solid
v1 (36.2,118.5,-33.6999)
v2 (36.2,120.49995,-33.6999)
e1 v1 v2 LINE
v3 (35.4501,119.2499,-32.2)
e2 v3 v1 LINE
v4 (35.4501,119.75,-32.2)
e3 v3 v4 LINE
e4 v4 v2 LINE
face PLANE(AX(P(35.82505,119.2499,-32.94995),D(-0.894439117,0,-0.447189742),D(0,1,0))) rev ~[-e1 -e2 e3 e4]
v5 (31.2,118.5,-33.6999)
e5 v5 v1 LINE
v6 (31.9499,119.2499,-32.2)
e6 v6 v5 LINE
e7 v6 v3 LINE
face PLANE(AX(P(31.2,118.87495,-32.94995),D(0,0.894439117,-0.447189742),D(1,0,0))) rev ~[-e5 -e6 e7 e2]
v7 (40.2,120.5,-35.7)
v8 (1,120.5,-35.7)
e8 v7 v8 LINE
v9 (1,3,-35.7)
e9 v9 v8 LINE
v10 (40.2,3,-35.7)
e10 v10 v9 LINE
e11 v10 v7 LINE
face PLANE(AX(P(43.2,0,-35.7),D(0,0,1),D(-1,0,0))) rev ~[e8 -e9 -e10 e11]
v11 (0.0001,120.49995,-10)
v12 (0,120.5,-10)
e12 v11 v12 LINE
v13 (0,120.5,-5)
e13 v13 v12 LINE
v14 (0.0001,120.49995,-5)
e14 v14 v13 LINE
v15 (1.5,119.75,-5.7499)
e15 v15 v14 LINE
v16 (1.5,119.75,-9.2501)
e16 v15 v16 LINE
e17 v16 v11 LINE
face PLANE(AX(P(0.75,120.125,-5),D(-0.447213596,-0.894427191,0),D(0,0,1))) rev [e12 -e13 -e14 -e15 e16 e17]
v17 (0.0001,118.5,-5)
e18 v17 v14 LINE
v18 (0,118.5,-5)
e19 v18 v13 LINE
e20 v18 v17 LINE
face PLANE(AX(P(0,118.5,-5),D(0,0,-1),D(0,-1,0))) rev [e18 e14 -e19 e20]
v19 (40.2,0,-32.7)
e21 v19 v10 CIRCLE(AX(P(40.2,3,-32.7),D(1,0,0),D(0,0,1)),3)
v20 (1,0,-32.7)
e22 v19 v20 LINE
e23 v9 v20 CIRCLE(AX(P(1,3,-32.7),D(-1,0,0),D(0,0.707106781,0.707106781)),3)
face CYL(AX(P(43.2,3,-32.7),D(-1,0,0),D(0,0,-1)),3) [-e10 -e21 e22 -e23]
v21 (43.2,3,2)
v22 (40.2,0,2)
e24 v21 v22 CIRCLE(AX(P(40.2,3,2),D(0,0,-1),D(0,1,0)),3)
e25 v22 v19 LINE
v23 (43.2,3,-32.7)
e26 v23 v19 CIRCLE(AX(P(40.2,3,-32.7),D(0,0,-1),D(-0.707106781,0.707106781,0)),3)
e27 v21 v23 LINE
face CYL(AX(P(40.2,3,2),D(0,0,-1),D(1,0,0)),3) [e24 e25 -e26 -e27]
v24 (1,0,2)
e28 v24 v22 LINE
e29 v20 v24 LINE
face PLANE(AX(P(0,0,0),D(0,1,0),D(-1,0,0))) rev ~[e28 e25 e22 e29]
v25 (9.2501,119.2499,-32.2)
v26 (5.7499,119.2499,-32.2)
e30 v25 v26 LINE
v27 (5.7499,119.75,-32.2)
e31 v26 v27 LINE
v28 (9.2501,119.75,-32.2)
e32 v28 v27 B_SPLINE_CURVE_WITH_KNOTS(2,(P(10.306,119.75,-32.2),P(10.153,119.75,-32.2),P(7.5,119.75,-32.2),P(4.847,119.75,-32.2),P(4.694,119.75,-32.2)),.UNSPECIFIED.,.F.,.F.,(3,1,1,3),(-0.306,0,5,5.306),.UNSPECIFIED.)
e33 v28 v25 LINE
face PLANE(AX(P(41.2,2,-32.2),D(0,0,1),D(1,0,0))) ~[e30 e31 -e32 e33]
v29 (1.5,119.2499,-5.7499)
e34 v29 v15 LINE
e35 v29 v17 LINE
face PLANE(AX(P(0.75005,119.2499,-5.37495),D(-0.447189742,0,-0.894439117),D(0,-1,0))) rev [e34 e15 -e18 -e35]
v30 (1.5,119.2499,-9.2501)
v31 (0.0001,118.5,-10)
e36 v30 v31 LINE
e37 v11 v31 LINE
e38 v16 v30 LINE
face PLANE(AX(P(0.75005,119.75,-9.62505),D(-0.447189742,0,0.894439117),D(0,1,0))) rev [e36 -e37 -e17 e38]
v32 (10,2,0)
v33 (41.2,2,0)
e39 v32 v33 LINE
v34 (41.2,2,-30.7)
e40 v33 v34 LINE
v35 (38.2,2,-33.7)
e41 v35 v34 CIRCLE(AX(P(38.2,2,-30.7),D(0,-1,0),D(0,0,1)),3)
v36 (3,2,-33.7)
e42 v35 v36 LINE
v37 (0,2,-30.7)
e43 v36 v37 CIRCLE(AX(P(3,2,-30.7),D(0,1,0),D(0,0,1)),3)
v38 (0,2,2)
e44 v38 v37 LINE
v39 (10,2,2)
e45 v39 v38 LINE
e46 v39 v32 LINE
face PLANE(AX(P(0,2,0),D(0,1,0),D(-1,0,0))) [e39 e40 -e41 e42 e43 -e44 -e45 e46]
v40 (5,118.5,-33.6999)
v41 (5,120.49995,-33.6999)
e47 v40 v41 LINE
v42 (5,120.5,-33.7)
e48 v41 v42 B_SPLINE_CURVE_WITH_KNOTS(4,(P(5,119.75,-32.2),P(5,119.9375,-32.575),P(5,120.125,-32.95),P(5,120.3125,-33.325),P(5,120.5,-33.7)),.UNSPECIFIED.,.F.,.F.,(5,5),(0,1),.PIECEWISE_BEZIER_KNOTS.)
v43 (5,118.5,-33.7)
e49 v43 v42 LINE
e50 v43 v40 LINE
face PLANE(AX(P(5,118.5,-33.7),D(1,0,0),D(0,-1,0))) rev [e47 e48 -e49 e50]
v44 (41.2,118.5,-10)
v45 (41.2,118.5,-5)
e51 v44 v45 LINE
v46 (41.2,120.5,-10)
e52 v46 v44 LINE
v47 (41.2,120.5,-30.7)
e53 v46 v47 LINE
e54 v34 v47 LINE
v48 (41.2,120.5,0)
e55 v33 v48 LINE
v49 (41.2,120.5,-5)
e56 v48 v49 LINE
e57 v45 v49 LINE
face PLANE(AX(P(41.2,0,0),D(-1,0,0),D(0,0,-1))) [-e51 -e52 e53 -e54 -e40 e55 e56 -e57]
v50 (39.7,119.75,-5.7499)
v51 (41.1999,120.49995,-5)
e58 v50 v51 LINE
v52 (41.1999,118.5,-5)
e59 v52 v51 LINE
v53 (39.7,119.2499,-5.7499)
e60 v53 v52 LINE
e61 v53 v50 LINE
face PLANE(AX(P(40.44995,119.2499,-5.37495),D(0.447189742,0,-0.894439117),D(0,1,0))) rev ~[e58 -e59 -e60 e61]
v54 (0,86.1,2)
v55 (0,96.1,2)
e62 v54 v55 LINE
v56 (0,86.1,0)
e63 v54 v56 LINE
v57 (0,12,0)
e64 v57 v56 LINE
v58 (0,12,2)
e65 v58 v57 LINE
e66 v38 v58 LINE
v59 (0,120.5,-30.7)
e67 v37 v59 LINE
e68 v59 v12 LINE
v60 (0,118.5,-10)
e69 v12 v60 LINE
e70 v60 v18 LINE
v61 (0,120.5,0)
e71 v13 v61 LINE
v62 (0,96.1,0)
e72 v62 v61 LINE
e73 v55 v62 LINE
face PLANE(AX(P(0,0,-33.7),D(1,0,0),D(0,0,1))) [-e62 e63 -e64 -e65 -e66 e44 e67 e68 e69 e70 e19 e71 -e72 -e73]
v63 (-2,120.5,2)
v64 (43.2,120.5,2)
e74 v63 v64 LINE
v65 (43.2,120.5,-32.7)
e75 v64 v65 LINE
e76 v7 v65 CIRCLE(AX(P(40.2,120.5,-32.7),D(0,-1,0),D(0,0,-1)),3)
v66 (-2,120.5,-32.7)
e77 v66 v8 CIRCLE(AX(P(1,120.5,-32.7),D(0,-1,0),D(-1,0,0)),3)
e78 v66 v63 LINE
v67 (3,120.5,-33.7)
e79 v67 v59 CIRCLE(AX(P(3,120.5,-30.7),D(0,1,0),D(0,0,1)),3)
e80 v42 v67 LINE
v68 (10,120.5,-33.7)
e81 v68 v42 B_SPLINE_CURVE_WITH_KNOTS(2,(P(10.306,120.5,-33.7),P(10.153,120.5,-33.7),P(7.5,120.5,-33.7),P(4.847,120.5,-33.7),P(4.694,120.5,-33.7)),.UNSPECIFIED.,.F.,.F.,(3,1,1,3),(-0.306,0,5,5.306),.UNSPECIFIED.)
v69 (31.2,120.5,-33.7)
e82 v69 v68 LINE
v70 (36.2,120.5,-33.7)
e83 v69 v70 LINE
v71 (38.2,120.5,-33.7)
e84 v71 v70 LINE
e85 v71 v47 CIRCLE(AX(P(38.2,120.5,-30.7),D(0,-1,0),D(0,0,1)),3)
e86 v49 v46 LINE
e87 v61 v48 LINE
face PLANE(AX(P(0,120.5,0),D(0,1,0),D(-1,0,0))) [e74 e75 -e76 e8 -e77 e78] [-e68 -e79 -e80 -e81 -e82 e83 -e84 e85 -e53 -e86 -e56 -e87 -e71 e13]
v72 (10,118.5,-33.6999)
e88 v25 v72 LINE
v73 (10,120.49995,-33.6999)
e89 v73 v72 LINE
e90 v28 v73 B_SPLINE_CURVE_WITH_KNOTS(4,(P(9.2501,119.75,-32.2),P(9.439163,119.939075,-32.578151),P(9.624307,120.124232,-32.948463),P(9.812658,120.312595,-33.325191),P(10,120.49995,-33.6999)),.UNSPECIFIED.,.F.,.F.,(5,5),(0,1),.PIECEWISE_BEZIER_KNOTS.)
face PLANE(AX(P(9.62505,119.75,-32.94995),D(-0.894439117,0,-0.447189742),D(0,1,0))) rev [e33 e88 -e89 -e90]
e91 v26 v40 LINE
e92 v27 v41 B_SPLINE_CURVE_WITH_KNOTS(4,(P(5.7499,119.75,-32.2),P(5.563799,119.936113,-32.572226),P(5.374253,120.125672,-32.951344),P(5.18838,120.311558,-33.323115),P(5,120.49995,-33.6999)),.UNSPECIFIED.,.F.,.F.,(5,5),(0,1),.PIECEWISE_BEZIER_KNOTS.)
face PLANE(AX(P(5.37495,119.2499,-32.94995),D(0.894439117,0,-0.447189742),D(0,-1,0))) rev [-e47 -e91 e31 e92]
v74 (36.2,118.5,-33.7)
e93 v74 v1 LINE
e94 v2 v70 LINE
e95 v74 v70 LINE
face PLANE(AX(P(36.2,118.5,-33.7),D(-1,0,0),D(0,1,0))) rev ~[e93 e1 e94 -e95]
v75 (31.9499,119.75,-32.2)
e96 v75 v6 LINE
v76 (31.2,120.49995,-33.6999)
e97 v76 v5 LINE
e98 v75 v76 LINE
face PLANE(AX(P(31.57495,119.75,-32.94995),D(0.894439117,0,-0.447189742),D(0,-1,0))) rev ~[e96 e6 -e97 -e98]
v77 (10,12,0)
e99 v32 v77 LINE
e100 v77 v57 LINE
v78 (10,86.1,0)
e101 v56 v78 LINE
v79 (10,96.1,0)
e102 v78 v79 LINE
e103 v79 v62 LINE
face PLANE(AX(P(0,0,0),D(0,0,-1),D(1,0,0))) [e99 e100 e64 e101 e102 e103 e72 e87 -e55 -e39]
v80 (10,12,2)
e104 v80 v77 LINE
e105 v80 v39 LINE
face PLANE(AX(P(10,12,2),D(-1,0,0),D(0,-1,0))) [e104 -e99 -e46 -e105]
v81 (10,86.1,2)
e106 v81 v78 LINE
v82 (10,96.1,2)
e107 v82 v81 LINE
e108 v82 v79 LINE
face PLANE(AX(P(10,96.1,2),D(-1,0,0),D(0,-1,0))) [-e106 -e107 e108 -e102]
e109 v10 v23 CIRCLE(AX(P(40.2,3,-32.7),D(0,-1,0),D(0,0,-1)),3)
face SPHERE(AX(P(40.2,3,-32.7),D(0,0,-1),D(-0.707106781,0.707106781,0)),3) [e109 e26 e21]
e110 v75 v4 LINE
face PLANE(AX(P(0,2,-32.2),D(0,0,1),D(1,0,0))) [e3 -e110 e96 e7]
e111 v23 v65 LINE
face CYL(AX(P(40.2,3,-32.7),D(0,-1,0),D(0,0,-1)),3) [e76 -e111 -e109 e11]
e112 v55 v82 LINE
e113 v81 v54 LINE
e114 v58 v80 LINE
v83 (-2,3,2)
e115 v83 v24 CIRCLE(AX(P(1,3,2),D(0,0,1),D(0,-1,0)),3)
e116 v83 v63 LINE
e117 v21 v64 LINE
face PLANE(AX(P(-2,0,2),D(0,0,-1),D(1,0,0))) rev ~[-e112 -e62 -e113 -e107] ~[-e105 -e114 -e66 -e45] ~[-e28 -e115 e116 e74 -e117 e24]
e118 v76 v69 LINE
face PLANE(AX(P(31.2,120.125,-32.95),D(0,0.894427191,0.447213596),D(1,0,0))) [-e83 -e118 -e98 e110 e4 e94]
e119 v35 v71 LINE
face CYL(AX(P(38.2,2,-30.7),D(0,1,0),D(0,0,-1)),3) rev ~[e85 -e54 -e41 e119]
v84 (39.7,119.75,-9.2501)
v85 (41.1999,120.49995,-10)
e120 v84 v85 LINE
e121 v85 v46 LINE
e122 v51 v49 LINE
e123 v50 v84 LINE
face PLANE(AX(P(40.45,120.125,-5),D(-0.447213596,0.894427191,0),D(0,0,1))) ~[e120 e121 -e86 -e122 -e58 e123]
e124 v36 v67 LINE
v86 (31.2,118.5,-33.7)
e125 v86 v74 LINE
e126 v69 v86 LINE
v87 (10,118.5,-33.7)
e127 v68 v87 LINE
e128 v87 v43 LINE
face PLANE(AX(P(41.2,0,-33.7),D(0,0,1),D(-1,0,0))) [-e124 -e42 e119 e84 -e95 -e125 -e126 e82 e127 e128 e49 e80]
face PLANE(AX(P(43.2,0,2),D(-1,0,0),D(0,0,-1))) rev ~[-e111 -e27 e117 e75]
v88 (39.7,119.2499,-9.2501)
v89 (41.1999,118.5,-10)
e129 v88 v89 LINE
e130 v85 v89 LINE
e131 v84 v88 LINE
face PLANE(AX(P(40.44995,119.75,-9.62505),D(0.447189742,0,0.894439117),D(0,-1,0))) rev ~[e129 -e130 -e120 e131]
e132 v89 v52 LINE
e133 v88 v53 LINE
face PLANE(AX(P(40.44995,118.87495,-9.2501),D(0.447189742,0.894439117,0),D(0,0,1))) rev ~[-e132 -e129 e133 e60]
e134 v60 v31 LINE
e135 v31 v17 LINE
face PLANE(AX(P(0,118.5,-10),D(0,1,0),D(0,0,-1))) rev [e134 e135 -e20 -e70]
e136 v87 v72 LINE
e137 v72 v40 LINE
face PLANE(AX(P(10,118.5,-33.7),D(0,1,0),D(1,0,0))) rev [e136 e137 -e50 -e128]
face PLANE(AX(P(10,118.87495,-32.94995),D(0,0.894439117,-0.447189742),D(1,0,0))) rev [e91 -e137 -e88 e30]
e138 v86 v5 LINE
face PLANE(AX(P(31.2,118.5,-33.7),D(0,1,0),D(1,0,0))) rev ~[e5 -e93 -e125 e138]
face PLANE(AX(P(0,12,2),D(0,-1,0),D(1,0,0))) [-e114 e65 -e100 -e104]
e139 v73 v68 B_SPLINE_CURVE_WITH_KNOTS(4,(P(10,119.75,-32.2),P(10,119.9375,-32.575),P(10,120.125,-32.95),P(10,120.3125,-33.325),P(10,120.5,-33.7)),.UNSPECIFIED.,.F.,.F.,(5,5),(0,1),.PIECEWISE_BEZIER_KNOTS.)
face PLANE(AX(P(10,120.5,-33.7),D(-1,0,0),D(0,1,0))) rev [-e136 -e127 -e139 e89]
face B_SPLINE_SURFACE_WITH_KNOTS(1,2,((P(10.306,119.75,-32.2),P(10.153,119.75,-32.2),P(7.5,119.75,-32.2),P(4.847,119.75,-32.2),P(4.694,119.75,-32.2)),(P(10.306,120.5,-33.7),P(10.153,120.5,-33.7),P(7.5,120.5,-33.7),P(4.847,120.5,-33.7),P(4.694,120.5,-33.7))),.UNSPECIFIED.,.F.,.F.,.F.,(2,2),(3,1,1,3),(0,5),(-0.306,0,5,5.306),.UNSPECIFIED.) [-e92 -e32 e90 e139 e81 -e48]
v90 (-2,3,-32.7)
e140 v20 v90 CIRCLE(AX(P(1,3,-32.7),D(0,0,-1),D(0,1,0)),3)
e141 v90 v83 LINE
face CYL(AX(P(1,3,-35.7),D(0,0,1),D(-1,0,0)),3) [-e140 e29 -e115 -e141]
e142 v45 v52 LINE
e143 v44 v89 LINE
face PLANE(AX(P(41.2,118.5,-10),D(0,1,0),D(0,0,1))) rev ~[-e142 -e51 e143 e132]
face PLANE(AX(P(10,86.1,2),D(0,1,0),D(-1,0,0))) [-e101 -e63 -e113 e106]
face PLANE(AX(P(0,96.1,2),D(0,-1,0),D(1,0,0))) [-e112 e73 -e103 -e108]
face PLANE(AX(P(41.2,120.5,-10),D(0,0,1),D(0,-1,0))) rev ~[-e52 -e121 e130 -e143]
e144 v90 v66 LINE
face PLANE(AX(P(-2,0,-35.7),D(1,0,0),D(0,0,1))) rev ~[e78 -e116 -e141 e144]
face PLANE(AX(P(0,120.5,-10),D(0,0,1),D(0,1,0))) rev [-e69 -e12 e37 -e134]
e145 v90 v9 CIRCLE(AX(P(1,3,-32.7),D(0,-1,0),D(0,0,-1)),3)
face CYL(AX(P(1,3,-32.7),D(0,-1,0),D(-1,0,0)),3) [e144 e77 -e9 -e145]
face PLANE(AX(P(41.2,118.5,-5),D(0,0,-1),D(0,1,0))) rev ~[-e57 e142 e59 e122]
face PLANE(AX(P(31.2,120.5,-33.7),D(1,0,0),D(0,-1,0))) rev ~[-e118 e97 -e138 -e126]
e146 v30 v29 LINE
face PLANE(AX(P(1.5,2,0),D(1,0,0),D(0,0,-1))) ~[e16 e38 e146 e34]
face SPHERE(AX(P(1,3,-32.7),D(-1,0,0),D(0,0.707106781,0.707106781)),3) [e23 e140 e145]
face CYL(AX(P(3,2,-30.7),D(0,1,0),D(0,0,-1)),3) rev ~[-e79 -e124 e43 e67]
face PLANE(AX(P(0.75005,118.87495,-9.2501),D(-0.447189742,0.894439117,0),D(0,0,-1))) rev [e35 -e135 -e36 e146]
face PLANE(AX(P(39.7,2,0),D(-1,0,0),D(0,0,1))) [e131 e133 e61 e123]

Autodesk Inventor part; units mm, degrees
ref_plane "YZ Plane" through (0, 0, 0) normal (1, 0, 0) x (0, 1, 0)
sketch "Sketch1" plane through (0, 0, 0) normal (0, 1, 0) x (-1, 0, 0)
  line L0 (0, 0) -> (-41.2, 0)
  line L1 (-41.2, 0) -> (-41.2, -33.7)
  line L2 (-41.2, -33.7) -> (0, -33.7)
  line L3 (0, -33.7) -> (0, 0)
  line L4 (2, 2) -> (-43.2, 2)
  line L5 (-43.2, 2) -> (-43.2, -35.7)
  line L6 (-43.2, -35.7) -> (2, -35.7)
  line L7 (2, -35.7) -> (2, 2)
  dimension "d0" = 33.7
  dimension "d1" = 41.2
  dimension "d2" = 2
  dimension "d3" = 2
  dimension "d4" = 2
  dimension "d5" = 2
extrude "Extrusion1" add sketch "Sketch1" along normal blind 2 contours L3 L2 L1 L0
extrude "Extrusion2" add sketch "Sketch1" along normal blind 120.5
sketch "Sketch2" plane through (41.2, 2, 0) normal (0, 0, -1) x (-1, 0, 0)
  line L0 (43.2, 118.5) -> (-2, 118.5) projected
  line L1 (36.2, 118.5) -> (31.2, 118.5)
  line L2 (31.2, 118.5) -> (31.2, 116.5)
  line L3 (31.2, 116.5) -> (36.2, 116.5)
  line L4 (36.2, 116.5) -> (36.2, 118.5)
  line L5 (41.2, 0) -> (41.2, 118.5) projected
  point P0 (41.2, -2)
  point P1 (31.2, 118.5)
  dimension "d10" = 5
  dimension "d11" = 2
  dimension "d12" = 5
sketch "Sketch3" plane through (41.2, 2, 0) normal (-1, 0, 0) x (0, 0, 1)
  point P0 (0, -2)
sketch "Sketch4" plane through (41.2, 2, 0) normal (-1, 0, 0) x (0, 0, 1)
  line L0 (2, 118.5) -> (-35.7, 118.5) projected
  line L1 (-5, 118.5) -> (-10, 118.5)
  line L2 (-10, 118.5) -> (-10, 116.5)
  line L3 (-10, 116.5) -> (-5, 116.5)
  line L4 (-5, 116.5) -> (-5, 118.5)
  line L5 (0, 0) -> (0, 118.5) projected
  point P0 (0, -2)
  dimension "d27" = 5
  dimension "d28" = 2
  dimension "d29" = 5
extrude "Extrusion4" add sketch "Sketch4" along normal blind 1.5
chamfer "Chamfer5" distance 0.75 distance2 1.5 1 edges at (39.7, 120.5, -7.5) measured on face at (39.7, 119.1667, -6.6667)
chamfer "Chamfer6" distance 0.75 distance2 1.5 1 edges at (39.7, 119.125, -10) measured on face at (39.7, 118.9167, -6.6667)
chamfer "Chamfer7" distance 0.75 distance2 1.5 1 edges at (39.7, 118.5, -7.1251) measured on face at (39.7, 119.3333, -7.8334)
chamfer "Chamfer8" distance 0.75 distance2 1.5 1 edges at (39.7, 119.5, -5) measured on face at (39.7, 119.5833, -6.4167)
sketch "Sketch5" plane through (0, 2, -33.7) normal (0, 0, 1) x (1, 0, 0)
  line L0 (0, 118.5) -> (41.2, 118.5) projected
  line L1 (36.2, 118.5) -> (31.2, 118.5)
  line L2 (31.2, 118.5) -> (31.2, 116.5)
  line L3 (31.2, 116.5) -> (36.2, 116.5)
  line L4 (36.2, 116.5) -> (36.2, 118.5)
  line L5 (41.2, 0) -> (41.2, 118.5) projected
  point P0 (0, -2)
  point P1 (31.2, 118.5)
  dimension "d45" = 5
  dimension "d46" = 2
  dimension "d47" = 5
extrude "Extrusion5" add sketch "Sketch5" along normal blind 1.5
chamfer "Chamfer9" distance 0.75 distance2 1.5 1 edges at (33.7, 120.5, -32.2) measured on face at (34.5333, 119.1667, -32.2)
chamfer "Chamfer10" distance 0.75 distance2 1.5 1 edges at (33.7, 118.5, -32.2) measured on face at (34.5333, 118.9167, -32.2)
chamfer "Chamfer11" distance 0.75 distance2 1.5 1 edges at (31.2, 119.4999, -32.2) measured on face at (34.5333, 119.4166, -32.2)
chamfer "Chamfer12" distance 0.75 distance2 1.5 1 edges at (36.2, 119.4999, -32.2) measured on face at (34.7833, 119.4166, -32.2)
ref_plane "Work Plane2" through (17.8, 0, -35.7) normal (-1, 0, 0) x (0, 0, 1)
ref_plane "Work Plane3" through (20.6, 0, 2) normal (1, 0, 0) x (0, 0, -1)
mirror "Mirror1" about plane through (20.6, 0, 2) normal (1, 0, 0) of "Extrusion5", "Extrusion4", "Chamfer5", "Chamfer8", "Chamfer7", "Chamfer9", "Chamfer11", "Chamfer10", "Chamfer12", "Chamfer6"
fillet "Fillet2" radius 3 3 edges at (-2, 0, -16.85) (20.6, 0, -35.7) (43.2, 0, -16.85)
fillet "Fillet3" radius 3 4 edges at (-1.1213, 0.8787, -34.8213) (-2, 61.75, -35.7) (42.3213, 0.8787, -34.8213) (43.2, 61.75, -35.7)
fillet "Fillet4" radius 3 2 edges at (0, 61.25, -33.7) (41.2, 61.25, -33.7)
sketch "Sketch10" plane through (-2, 120.5, 2) normal (0, 0, 1) x (1, 0, 0)
  line L0 (2, -24.4) -> (12, -24.4)
  line L1 (12, -24.4) -> (12, -34.4)
  line L2 (12, -34.4) -> (2, -34.4)
  line L3 (2, -34.4) -> (2, -24.4)
  line L4 (3, -120.5) -> (42.2, -120.5) projected
  line L5 (2, -118.5) -> (2, 0) projected
  line L6 (0, 0) -> (45.2, 0) projected
  point P0 (2, -120.5)
  dimension "d88" = 10
  dimension "d89" = 10
  dimension "d90" = 24.4
extrude "Extrusion10" cut sketch "Sketch10" against normal blind 10
sketch "Sketch11" plane through (-2, 120.5, 2) normal (0, 0, 1) x (1, 0, 0)
  line L0 (2, -108.5) -> (12, -108.5)
  line L1 (12, -108.5) -> (12, -118.5)
  line L2 (12, -118.5) -> (2, -118.5)
  line L3 (2, -118.5) -> (2, -108.5)
  line L4 (0, -117.5) -> (0, 0) projected
  line L5 (3, -120.5) -> (42.2, -120.5) projected
  point P0 (2, -120.5)
  dimension "d95" = 2
  dimension "d96" = 2
  dimension "d97" = 10
  dimension "d98" = 10
extrude "Extrusion11" cut sketch "Sketch11" against normal blind 10
sketch "Sketch12" plane through (43.2, 3, 2) normal (1, 0, 0) x (0, 0, -1)
  line L0 (26.35, 103.4808) -> (11.35, 107.5)
  arc A0 (25.4441, 100.1) -> (26.35, 103.4808) centre (25.8971, 101.7904) ccw
  line L1 (25.4441, 100.1) -> (10.4441, 104.1193)
  arc A1 (11.35, 107.5) -> (10.4441, 104.1193) centre (10.8971, 105.8096) ccw
  line L2 (0, 117.5) -> (34.7, 117.5) projected
  line L3 (0, 117.5) -> (37.7, 117.5)
  line L4 (10.4441, 104.1193) -> (10.4441, 103.1193)
  line L5 (37.7, 0) -> (37.7, 117.5) projected
  line L6 (26.35, 87.9641) -> (11.35, 91.9833)
  arc A2 (25.4441, 84.5834) -> (26.35, 87.9641) centre (25.8971, 86.2737) ccw
  line L7 (25.4441, 84.5834) -> (10.4441, 88.6026)
  arc A3 (11.35, 91.9833) -> (10.4441, 88.6026) centre (10.8971, 90.293) ccw
  line L8 (10.4441, 88.6026) -> (10.4441, 87.6026)
  line L9 (26.35, 72.4474) -> (11.35, 76.4667)
  arc A4 (25.4441, 69.0667) -> (26.35, 72.4474) centre (25.8971, 70.7571) ccw
  line L10 (25.4441, 69.0667) -> (10.4441, 73.0859)
  arc A5 (11.35, 76.4667) -> (10.4441, 73.0859) centre (10.8971, 74.7763) ccw
  line L11 (10.4441, 73.0859) -> (10.4441, 72.0859)
  line L12 (26.35, 56.9308) -> (11.35, 60.95)
  arc A6 (25.4441, 53.55) -> (26.35, 56.9308) centre (25.8971, 55.2404) ccw
  line L13 (25.4441, 53.55) -> (10.4441, 57.5692)
  arc A7 (11.35, 60.95) -> (10.4441, 57.5692) centre (10.8971, 59.2596) ccw
  line L14 (10.4441, 57.5692) -> (10.4441, 56.5692)
  line L15 (26.35, 41.4141) -> (11.35, 45.4333)
  arc A8 (25.4441, 38.0333) -> (26.35, 41.4141) centre (25.8971, 39.7237) ccw
  line L16 (25.4441, 38.0333) -> (10.4441, 42.0526)
  arc A9 (11.35, 45.4333) -> (10.4441, 42.0526) centre (10.8971, 43.7429) ccw
  line L17 (10.4441, 42.0526) -> (10.4441, 41.0526)
  line L18 (26.35, 25.8974) -> (11.35, 29.9166)
  arc A10 (25.4441, 22.5167) -> (26.35, 25.8974) centre (25.8971, 24.207) ccw
  line L19 (25.4441, 22.5167) -> (10.4441, 26.5359)
  arc A11 (11.35, 29.9166) -> (10.4441, 26.5359) centre (10.8971, 28.2263) ccw
  line L20 (10.4441, 26.5359) -> (10.4441, 25.5359)
  line L21 (26.35, 10.3807) -> (11.35, 14.4)
  arc A12 (25.4441, 7) -> (26.35, 10.3807) centre (25.8971, 8.6904) ccw
  line L22 (25.4441, 7) -> (10.4441, 11.0192)
  arc A13 (11.35, 14.4) -> (10.4441, 11.0192) centre (10.8971, 12.7096) ccw
  line L23 (10.4441, 11.0192) -> (10.4441, 10.0192)
  line L24 (0, -3) -> (34.7, -3) projected
  point P0 (18.85, 105.4904)
  point P1 (18.85, 117.5)
  point P2 (18.85, 89.9737)
  point P3 (18.85, 74.457)
  point P4 (18.85, 58.9404)
  point P5 (18.85, 43.4237)
  point P6 (18.85, 27.907)
  point P7 (18.85, 12.3904)
  dimension "d113" = 15
  dimension "d114" = 3.5
  dimension "d115" = 1
  dimension "d116" = 75
  dimension "d117" = 10
  dimension "d120" = 15.5167
  dimension "d125" = 10
extrude "Extrusion12" [suppressed]
sketch "Sketch13" plane through (-2, 3, 2) normal (-1, 0, 0) x (0, 0, 1)
  line L0 (-9.85, 103.4808) -> (-24.85, 107.5)
  arc A0 (-10.7559, 100.1) -> (-9.85, 103.4808) centre (-10.3029, 101.7904) ccw
  line L1 (-10.7559, 100.1) -> (-25.7559, 104.1193)
  arc A1 (-24.85, 107.5) -> (-25.7559, 104.1193) centre (-25.3029, 105.8096) ccw
  line L2 (-25.7559, 104.1193) -> (-25.7559, 103.1193)
  line L3 (0, -3) -> (0, 117.5)
  line L4 (-9.85, 87.9641) -> (-24.85, 91.9833)
  arc A2 (-10.7559, 84.5834) -> (-9.85, 87.9641) centre (-10.3029, 86.2737) ccw
  line L5 (-10.7559, 84.5834) -> (-25.7559, 88.6026)
  arc A3 (-24.85, 91.9833) -> (-25.7559, 88.6026) centre (-25.3029, 90.293) ccw
  line L6 (-25.7559, 88.6026) -> (-25.7559, 87.6026)
  line L7 (-9.85, 72.4474) -> (-24.85, 76.4667)
  arc A4 (-10.7559, 69.0667) -> (-9.85, 72.4474) centre (-10.3029, 70.7571) ccw
  line L8 (-10.7559, 69.0667) -> (-25.7559, 73.0859)
  arc A5 (-24.85, 76.4667) -> (-25.7559, 73.0859) centre (-25.3029, 74.7763) ccw
  line L9 (-25.7559, 73.0859) -> (-25.7559, 72.0859)
  line L10 (-9.85, 56.9308) -> (-24.85, 60.95)
  arc A6 (-10.7559, 53.55) -> (-9.85, 56.9308) centre (-10.3029, 55.2404) ccw
  line L11 (-10.7559, 53.55) -> (-25.7559, 57.5692)
  arc A7 (-24.85, 60.95) -> (-25.7559, 57.5692) centre (-25.3029, 59.2596) ccw
  line L12 (-25.7559, 57.5692) -> (-25.7559, 56.5692)
  line L13 (-9.85, 41.4141) -> (-24.85, 45.4333)
  arc A8 (-10.7559, 38.0333) -> (-9.85, 41.4141) centre (-10.3029, 39.7237) ccw
  line L14 (-10.7559, 38.0333) -> (-25.7559, 42.0526)
  arc A9 (-24.85, 45.4333) -> (-25.7559, 42.0526) centre (-25.3029, 43.7429) ccw
  line L15 (-25.7559, 42.0526) -> (-25.7559, 41.0526)
  line L16 (-9.85, 25.8974) -> (-24.85, 29.9166)
  arc A10 (-10.7559, 22.5167) -> (-9.85, 25.8974) centre (-10.3029, 24.207) ccw
  line L17 (-10.7559, 22.5167) -> (-25.7559, 26.5359)
  arc A11 (-24.85, 29.9166) -> (-25.7559, 26.5359) centre (-25.3029, 28.2263) ccw
  line L18 (-25.7559, 26.5359) -> (-25.7559, 25.5359)
  line L19 (-9.85, 10.3807) -> (-24.85, 14.4)
  arc A12 (-10.7559, 7) -> (-9.85, 10.3807) centre (-10.3029, 8.6904) ccw
  line L20 (-10.7559, 7) -> (-25.7559, 11.0192)
  arc A13 (-24.85, 14.4) -> (-25.7559, 11.0192) centre (-25.3029, 12.7096) ccw
  line L21 (-25.7559, 11.0192) -> (-25.7559, 10.0192)
  line L22 (0, 0) -> (0, -3) projected
  line L23 (-34.7, 117.5) -> (0, 117.5) projected
  line L24 (-34.7, -3) -> (0, -3) projected
  line L25 (-37.7, 0) -> (-37.7, 117.5) projected
  line L26 (0, 0) -> (0, 117.5) projected
  line L27 (-37.7, 117.5) -> (0, 117.5)
  point P0 (-17.35, 105.4904)
  point P1 (-17.35, 89.9737)
  point P2 (-17.35, 74.457)
  point P3 (-17.35, 58.9404)
  point P4 (-17.35, 43.4237)
  point P5 (-17.35, 27.907)
  point P6 (-17.35, 12.3904)
  point P7 (-17.35, 117.5)
  dimension "d132" = 15
  dimension "d133" = 3.5
  dimension "d134" = 1
  dimension "d135" = 75
  dimension "d137" = 15.5167
  dimension "d140" = 10
  dimension "d141" = 10
extrude "Extrusion13" [suppressed]
properties part number "Batterihållare 2"
